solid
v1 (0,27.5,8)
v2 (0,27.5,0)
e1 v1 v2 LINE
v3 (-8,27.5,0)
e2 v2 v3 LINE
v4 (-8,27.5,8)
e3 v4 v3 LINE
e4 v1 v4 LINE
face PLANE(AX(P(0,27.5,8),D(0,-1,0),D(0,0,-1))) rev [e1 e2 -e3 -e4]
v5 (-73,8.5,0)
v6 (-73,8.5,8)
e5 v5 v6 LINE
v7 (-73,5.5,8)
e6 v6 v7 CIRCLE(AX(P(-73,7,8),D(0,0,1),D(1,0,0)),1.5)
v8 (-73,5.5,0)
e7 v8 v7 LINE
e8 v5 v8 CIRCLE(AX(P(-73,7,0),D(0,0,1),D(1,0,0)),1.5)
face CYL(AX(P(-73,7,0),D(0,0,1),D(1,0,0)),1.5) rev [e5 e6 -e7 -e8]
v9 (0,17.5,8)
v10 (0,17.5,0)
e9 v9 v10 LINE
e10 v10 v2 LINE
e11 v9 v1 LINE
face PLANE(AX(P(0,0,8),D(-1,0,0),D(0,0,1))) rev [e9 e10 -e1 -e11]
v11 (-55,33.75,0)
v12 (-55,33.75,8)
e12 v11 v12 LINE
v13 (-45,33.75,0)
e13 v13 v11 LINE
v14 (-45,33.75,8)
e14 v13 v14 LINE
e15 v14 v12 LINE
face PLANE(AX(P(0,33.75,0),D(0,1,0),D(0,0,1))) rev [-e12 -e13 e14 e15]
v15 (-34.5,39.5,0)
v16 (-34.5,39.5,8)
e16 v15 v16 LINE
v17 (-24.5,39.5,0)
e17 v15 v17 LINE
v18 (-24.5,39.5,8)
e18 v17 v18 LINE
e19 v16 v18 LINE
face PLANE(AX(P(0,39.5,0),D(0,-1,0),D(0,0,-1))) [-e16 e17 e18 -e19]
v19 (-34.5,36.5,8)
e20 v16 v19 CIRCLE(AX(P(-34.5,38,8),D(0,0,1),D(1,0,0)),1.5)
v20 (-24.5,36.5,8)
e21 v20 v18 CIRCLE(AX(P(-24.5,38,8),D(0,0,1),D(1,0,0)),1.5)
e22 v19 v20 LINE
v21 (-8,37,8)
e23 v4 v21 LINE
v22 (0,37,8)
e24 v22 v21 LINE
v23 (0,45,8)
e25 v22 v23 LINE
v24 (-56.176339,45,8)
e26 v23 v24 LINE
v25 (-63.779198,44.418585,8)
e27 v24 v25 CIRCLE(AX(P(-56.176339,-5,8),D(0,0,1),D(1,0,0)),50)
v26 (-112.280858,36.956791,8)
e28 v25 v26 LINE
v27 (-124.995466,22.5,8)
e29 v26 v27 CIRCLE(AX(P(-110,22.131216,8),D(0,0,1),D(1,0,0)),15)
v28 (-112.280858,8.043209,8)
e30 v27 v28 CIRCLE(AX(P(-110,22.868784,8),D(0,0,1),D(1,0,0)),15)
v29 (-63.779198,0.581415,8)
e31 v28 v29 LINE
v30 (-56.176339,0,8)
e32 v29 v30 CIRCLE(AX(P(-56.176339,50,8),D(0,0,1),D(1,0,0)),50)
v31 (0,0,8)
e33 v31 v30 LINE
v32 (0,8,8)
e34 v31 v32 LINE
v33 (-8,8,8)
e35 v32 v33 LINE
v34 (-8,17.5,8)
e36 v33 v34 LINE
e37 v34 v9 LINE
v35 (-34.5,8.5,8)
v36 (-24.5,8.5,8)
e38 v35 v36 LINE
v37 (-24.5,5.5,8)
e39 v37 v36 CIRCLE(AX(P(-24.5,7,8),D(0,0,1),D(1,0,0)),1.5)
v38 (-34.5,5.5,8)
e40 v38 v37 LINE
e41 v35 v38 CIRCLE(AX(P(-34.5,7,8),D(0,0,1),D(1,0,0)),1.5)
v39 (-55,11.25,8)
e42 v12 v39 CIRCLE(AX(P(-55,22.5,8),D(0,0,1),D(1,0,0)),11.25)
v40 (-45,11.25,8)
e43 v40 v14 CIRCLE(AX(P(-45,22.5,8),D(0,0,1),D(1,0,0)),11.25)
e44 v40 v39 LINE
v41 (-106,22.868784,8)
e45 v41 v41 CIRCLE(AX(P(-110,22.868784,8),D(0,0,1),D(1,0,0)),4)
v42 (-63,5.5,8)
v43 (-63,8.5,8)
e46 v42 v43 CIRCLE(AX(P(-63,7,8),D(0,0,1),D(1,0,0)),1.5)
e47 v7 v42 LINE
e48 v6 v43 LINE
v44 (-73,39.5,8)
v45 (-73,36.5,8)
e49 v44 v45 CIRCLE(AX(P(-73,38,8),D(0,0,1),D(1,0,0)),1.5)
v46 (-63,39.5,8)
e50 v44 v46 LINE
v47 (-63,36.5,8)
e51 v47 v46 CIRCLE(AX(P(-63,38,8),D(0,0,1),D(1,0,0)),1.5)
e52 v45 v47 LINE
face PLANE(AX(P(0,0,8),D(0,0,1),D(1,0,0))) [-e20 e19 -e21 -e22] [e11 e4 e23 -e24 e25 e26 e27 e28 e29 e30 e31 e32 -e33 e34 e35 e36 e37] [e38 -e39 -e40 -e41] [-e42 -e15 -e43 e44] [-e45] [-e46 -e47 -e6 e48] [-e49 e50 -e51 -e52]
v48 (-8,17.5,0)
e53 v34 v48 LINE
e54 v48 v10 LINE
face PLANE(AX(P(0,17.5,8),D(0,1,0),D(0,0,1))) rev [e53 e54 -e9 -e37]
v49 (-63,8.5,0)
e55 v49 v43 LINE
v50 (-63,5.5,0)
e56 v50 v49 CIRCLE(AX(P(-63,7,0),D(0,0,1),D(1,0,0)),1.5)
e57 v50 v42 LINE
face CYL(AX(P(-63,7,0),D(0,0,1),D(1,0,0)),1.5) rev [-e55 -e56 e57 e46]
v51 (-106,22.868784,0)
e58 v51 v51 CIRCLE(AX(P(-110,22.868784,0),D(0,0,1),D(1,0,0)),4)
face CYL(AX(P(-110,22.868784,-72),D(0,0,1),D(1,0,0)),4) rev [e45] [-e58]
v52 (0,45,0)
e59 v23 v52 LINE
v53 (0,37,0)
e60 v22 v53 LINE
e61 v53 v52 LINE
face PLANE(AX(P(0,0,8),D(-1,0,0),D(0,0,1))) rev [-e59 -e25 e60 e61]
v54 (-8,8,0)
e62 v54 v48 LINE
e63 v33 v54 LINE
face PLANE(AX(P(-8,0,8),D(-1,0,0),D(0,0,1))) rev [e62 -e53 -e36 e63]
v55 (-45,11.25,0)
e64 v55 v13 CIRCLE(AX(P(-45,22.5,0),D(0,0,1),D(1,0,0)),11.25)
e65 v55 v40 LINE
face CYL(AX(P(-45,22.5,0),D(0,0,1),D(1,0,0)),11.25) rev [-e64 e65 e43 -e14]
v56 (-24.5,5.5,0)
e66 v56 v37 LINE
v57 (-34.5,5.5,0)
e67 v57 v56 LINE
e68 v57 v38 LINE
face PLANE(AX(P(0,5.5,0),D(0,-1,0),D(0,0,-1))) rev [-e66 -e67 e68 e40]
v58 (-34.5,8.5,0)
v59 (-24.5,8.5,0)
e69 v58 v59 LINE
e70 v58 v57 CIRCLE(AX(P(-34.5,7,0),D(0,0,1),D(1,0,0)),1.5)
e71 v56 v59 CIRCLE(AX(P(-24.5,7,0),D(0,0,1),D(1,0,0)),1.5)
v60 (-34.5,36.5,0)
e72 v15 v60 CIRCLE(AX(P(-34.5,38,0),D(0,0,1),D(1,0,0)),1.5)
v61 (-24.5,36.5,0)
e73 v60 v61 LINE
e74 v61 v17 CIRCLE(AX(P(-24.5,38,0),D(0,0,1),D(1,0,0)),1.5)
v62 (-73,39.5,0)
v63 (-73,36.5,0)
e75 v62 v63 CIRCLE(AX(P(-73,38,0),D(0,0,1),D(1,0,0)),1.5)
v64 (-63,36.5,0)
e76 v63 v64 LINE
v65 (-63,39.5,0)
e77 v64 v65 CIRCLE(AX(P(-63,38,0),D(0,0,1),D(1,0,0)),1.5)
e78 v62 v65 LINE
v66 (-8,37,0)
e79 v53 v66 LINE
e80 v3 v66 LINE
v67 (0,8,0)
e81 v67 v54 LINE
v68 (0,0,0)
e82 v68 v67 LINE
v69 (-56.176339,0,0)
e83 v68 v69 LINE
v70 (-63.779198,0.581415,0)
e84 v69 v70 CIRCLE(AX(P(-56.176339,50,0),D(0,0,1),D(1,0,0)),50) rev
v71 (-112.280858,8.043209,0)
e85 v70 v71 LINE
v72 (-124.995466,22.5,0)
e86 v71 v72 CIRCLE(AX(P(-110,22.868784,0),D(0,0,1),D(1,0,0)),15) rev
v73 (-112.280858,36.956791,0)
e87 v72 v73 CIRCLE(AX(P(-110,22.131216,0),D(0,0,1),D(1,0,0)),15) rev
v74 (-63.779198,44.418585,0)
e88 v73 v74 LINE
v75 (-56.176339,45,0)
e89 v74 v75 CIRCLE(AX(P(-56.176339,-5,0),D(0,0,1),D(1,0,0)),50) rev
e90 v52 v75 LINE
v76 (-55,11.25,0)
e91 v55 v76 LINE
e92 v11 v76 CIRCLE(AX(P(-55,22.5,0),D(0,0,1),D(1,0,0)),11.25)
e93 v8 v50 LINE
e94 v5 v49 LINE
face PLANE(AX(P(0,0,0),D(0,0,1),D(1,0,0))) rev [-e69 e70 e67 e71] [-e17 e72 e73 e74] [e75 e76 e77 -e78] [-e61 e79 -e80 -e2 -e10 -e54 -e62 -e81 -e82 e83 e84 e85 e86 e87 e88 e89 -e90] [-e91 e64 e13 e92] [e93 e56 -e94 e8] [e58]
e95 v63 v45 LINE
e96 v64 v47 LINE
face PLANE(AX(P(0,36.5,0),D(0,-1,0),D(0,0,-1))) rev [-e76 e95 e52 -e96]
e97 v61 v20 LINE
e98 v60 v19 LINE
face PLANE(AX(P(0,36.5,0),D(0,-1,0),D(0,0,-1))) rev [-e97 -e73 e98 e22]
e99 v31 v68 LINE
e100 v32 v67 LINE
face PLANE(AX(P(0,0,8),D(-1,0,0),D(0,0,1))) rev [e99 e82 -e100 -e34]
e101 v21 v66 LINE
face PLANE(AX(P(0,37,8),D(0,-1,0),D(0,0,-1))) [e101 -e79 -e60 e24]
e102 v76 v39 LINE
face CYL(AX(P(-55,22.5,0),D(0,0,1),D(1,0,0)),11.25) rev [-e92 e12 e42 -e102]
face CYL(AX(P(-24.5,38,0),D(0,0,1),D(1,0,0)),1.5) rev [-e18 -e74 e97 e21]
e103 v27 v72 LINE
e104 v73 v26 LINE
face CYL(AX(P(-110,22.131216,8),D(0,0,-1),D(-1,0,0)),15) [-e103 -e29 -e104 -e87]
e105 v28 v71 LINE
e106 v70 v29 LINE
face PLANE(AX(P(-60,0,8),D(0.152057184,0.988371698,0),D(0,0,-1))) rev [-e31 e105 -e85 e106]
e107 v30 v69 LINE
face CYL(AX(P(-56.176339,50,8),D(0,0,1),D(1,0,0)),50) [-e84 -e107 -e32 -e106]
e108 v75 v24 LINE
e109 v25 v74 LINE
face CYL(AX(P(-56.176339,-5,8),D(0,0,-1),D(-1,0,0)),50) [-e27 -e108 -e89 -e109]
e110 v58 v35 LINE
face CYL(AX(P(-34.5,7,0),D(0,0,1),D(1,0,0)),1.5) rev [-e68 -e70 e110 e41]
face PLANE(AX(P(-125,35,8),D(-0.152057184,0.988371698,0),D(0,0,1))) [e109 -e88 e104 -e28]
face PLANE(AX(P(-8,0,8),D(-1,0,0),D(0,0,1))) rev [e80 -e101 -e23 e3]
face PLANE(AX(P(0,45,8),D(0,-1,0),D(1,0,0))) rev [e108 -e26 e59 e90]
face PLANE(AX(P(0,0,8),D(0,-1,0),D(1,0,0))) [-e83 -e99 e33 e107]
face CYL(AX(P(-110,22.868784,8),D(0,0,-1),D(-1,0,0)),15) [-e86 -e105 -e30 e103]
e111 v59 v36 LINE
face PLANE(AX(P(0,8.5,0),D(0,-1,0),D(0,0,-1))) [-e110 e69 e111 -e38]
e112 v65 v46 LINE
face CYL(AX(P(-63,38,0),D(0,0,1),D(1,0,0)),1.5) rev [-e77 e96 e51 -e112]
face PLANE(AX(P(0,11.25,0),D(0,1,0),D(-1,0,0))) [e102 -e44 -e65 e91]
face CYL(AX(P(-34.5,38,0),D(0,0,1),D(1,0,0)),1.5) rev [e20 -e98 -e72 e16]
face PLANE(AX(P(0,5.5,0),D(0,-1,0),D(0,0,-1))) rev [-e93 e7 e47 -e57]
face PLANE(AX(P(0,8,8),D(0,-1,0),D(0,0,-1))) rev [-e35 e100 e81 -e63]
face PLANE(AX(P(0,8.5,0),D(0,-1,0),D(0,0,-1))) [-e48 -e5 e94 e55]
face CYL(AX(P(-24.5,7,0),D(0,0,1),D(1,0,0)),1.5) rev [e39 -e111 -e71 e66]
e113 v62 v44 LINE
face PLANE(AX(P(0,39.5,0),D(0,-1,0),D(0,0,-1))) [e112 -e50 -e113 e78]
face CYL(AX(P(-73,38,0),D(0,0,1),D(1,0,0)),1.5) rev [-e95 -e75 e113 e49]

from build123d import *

# Parameters (mm, degrees)
BOSS_EXTRUDE1_DEPTH = 8
CHAMFER1_SIZE       = 10
CHAMFER1_SIZE2      = 65
CHAMFER2_SIZE       = 65
CHAMFER2_SIZE2      = 10
FILLET2_R           = 15
FILLET3_R           = 50
SKETCH2_R           = 4
CUT_EXTRUDE1_DEPTH  = 80
CUT_EXTRUDE2_DEPTH  = 8


with BuildPart() as part:
    # Sketch1 → Boss-Extrude1 (new body)
    with BuildSketch(Plane.XY):
        Polygon((0, 17.5), (0, 27.5), (-8, 27.5), (-8, 37), (0, 37), (0, 45), (-125, 45), (-125, 22.5), (-125, 0), (0, 0), (0, 8), (-8, 8), (-8, 17.5), align=None)
    extrude(amount=BOSS_EXTRUDE1_DEPTH)

    # Chamfer1
    chamfer1_edges = [part.edges().sort_by_distance(p)[0] for p in [
        (-125, 0, 4),
    ]]
    chamfer1_side = [part.faces().sort_by_distance(p)[0] for p in [
        (-125, 22.5, 4),
    ]]
    chamfer(chamfer1_edges, length=CHAMFER1_SIZE, length2=CHAMFER1_SIZE2, reference=chamfer1_side[0])

    # Chamfer2
    chamfer2_edges = [part.edges().sort_by_distance(p)[0] for p in [
        (-125, 45, 4),
    ]]
    chamfer2_side = [part.faces().sort_by_distance(p)[0] for p in [
        (-62.5, 45, 4),
    ]]
    chamfer(chamfer2_edges, length=CHAMFER2_SIZE, length2=CHAMFER2_SIZE2, reference=chamfer2_side[0])

    # Fillet2
    # the kernel refuses this fillet: 15 mm, written as the material it takes off along each edge
    with BuildSketch(Plane(origin=(-125, 10, -32.171960879), x_dir=(0, 1, 0), z_dir=(0, 0, 1))) as fillet2_piece_1:
        with BuildLine():
            CenterArc((FILLET2_R * 0.857918956767, -FILLET2_R), FILLET2_R, 90, 81.253837737)
            Line((-FILLET2_R * 0.130452740884, -FILLET2_R * 0.847942815746), (0, 0))
            Line((0, 0), (FILLET2_R * 0.857918956767, 0))
        make_face()
    extrude(amount=72.343921757, mode=Mode.SUBTRACT)
    with BuildSketch(Plane(origin=(-125, 35, -32.171960879), x_dir=(0, -1, 0), z_dir=(0, 0, 1))) as fillet2_piece_2:
        with BuildLine():
            CenterArc((FILLET2_R * 0.857918956767, FILLET2_R), FILLET2_R, 188.746162263, 81.253837737)
            Line((-FILLET2_R * 0.130452740884, FILLET2_R * 0.847942815746), (0, 0))
            Line((0, 0), (FILLET2_R * 0.857918956767, 0))
        make_face()
    extrude(amount=72.343921757, mode=Mode.SUBTRACT)

    # Fillet3
    fillet3_edges = [part.edges().sort_by_distance(p)[0] for p in [
        (-60, 0, 4),
        (-60, 45, 4),
    ]]
    fillet(fillet3_edges, radius=FILLET3_R)

    # Sketch2 → Cut-Extrude1 (cut)
    with BuildSketch(Plane.XY.offset(8)):
        with Locations((-110, 22.868784351)):
            Circle(SKETCH2_R)
    extrude(amount=-CUT_EXTRUDE1_DEPTH, mode=Mode.SUBTRACT)

    # Sketch3 → Cut-Extrude2 (cut)
    with BuildSketch(Plane.XY.offset(8)):
        with BuildLine():
            Line((-73, 5.5), (-63, 5.5))
            ThreePointArc((-63, 5.5), (-61.5, 7), (-63, 8.5))
            Line((-63, 8.5), (-73, 8.5))
            ThreePointArc((-73, 8.5), (-74.5, 7), (-73, 5.5))
        make_face()
        with BuildLine():
            Line((-73, 36.5), (-63, 36.5))
            ThreePointArc((-63, 36.5), (-61.5, 38), (-63, 39.5))
            Line((-63, 39.5), (-73, 39.5))
            ThreePointArc((-73, 39.5), (-74.5, 38), (-73, 36.5))
        make_face()
        with BuildLine():
            ThreePointArc((-45, 11.25), (-37.045048712, 14.545048712), (-33.75, 22.5))
            Line((-33.75, 22.5), (-50, 22.5))
            Line((-50, 22.5), (-50, 33.75))
            Line((-50, 33.75), (-55, 33.75))
            ThreePointArc((-55, 33.75), (-66.25, 22.5), (-55, 11.25))
            Line((-55, 11.25), (-45, 11.25))
        make_face()
        with BuildLine():
            Line((-50, 22.5), (-33.75, 22.5))
            ThreePointArc((-33.75, 22.5), (-37.045048712, 30.454951288), (-45, 33.75))
            Line((-45, 33.75), (-50, 33.75))
            Line((-50, 33.75), (-50, 22.5))
        make_face()
        with BuildLine():
            Line((-34.5, 36.5), (-24.5, 36.5))
            ThreePointArc((-24.5, 36.5), (-23, 38), (-24.5, 39.5))
            Line((-24.5, 39.5), (-34.5, 39.5))
            ThreePointArc((-34.5, 39.5), (-36, 38), (-34.5, 36.5))
        make_face()
        with BuildLine():
            Line((-34.5, 5.5), (-24.5, 5.5))
            ThreePointArc((-24.5, 5.5), (-23, 7), (-24.5, 8.5))
            Line((-24.5, 8.5), (-34.5, 8.5))
            ThreePointArc((-34.5, 8.5), (-36, 7), (-34.5, 5.5))
        make_face()
    extrude(amount=-CUT_EXTRUDE2_DEPTH, mode=Mode.SUBTRACT)


solid = part.part
